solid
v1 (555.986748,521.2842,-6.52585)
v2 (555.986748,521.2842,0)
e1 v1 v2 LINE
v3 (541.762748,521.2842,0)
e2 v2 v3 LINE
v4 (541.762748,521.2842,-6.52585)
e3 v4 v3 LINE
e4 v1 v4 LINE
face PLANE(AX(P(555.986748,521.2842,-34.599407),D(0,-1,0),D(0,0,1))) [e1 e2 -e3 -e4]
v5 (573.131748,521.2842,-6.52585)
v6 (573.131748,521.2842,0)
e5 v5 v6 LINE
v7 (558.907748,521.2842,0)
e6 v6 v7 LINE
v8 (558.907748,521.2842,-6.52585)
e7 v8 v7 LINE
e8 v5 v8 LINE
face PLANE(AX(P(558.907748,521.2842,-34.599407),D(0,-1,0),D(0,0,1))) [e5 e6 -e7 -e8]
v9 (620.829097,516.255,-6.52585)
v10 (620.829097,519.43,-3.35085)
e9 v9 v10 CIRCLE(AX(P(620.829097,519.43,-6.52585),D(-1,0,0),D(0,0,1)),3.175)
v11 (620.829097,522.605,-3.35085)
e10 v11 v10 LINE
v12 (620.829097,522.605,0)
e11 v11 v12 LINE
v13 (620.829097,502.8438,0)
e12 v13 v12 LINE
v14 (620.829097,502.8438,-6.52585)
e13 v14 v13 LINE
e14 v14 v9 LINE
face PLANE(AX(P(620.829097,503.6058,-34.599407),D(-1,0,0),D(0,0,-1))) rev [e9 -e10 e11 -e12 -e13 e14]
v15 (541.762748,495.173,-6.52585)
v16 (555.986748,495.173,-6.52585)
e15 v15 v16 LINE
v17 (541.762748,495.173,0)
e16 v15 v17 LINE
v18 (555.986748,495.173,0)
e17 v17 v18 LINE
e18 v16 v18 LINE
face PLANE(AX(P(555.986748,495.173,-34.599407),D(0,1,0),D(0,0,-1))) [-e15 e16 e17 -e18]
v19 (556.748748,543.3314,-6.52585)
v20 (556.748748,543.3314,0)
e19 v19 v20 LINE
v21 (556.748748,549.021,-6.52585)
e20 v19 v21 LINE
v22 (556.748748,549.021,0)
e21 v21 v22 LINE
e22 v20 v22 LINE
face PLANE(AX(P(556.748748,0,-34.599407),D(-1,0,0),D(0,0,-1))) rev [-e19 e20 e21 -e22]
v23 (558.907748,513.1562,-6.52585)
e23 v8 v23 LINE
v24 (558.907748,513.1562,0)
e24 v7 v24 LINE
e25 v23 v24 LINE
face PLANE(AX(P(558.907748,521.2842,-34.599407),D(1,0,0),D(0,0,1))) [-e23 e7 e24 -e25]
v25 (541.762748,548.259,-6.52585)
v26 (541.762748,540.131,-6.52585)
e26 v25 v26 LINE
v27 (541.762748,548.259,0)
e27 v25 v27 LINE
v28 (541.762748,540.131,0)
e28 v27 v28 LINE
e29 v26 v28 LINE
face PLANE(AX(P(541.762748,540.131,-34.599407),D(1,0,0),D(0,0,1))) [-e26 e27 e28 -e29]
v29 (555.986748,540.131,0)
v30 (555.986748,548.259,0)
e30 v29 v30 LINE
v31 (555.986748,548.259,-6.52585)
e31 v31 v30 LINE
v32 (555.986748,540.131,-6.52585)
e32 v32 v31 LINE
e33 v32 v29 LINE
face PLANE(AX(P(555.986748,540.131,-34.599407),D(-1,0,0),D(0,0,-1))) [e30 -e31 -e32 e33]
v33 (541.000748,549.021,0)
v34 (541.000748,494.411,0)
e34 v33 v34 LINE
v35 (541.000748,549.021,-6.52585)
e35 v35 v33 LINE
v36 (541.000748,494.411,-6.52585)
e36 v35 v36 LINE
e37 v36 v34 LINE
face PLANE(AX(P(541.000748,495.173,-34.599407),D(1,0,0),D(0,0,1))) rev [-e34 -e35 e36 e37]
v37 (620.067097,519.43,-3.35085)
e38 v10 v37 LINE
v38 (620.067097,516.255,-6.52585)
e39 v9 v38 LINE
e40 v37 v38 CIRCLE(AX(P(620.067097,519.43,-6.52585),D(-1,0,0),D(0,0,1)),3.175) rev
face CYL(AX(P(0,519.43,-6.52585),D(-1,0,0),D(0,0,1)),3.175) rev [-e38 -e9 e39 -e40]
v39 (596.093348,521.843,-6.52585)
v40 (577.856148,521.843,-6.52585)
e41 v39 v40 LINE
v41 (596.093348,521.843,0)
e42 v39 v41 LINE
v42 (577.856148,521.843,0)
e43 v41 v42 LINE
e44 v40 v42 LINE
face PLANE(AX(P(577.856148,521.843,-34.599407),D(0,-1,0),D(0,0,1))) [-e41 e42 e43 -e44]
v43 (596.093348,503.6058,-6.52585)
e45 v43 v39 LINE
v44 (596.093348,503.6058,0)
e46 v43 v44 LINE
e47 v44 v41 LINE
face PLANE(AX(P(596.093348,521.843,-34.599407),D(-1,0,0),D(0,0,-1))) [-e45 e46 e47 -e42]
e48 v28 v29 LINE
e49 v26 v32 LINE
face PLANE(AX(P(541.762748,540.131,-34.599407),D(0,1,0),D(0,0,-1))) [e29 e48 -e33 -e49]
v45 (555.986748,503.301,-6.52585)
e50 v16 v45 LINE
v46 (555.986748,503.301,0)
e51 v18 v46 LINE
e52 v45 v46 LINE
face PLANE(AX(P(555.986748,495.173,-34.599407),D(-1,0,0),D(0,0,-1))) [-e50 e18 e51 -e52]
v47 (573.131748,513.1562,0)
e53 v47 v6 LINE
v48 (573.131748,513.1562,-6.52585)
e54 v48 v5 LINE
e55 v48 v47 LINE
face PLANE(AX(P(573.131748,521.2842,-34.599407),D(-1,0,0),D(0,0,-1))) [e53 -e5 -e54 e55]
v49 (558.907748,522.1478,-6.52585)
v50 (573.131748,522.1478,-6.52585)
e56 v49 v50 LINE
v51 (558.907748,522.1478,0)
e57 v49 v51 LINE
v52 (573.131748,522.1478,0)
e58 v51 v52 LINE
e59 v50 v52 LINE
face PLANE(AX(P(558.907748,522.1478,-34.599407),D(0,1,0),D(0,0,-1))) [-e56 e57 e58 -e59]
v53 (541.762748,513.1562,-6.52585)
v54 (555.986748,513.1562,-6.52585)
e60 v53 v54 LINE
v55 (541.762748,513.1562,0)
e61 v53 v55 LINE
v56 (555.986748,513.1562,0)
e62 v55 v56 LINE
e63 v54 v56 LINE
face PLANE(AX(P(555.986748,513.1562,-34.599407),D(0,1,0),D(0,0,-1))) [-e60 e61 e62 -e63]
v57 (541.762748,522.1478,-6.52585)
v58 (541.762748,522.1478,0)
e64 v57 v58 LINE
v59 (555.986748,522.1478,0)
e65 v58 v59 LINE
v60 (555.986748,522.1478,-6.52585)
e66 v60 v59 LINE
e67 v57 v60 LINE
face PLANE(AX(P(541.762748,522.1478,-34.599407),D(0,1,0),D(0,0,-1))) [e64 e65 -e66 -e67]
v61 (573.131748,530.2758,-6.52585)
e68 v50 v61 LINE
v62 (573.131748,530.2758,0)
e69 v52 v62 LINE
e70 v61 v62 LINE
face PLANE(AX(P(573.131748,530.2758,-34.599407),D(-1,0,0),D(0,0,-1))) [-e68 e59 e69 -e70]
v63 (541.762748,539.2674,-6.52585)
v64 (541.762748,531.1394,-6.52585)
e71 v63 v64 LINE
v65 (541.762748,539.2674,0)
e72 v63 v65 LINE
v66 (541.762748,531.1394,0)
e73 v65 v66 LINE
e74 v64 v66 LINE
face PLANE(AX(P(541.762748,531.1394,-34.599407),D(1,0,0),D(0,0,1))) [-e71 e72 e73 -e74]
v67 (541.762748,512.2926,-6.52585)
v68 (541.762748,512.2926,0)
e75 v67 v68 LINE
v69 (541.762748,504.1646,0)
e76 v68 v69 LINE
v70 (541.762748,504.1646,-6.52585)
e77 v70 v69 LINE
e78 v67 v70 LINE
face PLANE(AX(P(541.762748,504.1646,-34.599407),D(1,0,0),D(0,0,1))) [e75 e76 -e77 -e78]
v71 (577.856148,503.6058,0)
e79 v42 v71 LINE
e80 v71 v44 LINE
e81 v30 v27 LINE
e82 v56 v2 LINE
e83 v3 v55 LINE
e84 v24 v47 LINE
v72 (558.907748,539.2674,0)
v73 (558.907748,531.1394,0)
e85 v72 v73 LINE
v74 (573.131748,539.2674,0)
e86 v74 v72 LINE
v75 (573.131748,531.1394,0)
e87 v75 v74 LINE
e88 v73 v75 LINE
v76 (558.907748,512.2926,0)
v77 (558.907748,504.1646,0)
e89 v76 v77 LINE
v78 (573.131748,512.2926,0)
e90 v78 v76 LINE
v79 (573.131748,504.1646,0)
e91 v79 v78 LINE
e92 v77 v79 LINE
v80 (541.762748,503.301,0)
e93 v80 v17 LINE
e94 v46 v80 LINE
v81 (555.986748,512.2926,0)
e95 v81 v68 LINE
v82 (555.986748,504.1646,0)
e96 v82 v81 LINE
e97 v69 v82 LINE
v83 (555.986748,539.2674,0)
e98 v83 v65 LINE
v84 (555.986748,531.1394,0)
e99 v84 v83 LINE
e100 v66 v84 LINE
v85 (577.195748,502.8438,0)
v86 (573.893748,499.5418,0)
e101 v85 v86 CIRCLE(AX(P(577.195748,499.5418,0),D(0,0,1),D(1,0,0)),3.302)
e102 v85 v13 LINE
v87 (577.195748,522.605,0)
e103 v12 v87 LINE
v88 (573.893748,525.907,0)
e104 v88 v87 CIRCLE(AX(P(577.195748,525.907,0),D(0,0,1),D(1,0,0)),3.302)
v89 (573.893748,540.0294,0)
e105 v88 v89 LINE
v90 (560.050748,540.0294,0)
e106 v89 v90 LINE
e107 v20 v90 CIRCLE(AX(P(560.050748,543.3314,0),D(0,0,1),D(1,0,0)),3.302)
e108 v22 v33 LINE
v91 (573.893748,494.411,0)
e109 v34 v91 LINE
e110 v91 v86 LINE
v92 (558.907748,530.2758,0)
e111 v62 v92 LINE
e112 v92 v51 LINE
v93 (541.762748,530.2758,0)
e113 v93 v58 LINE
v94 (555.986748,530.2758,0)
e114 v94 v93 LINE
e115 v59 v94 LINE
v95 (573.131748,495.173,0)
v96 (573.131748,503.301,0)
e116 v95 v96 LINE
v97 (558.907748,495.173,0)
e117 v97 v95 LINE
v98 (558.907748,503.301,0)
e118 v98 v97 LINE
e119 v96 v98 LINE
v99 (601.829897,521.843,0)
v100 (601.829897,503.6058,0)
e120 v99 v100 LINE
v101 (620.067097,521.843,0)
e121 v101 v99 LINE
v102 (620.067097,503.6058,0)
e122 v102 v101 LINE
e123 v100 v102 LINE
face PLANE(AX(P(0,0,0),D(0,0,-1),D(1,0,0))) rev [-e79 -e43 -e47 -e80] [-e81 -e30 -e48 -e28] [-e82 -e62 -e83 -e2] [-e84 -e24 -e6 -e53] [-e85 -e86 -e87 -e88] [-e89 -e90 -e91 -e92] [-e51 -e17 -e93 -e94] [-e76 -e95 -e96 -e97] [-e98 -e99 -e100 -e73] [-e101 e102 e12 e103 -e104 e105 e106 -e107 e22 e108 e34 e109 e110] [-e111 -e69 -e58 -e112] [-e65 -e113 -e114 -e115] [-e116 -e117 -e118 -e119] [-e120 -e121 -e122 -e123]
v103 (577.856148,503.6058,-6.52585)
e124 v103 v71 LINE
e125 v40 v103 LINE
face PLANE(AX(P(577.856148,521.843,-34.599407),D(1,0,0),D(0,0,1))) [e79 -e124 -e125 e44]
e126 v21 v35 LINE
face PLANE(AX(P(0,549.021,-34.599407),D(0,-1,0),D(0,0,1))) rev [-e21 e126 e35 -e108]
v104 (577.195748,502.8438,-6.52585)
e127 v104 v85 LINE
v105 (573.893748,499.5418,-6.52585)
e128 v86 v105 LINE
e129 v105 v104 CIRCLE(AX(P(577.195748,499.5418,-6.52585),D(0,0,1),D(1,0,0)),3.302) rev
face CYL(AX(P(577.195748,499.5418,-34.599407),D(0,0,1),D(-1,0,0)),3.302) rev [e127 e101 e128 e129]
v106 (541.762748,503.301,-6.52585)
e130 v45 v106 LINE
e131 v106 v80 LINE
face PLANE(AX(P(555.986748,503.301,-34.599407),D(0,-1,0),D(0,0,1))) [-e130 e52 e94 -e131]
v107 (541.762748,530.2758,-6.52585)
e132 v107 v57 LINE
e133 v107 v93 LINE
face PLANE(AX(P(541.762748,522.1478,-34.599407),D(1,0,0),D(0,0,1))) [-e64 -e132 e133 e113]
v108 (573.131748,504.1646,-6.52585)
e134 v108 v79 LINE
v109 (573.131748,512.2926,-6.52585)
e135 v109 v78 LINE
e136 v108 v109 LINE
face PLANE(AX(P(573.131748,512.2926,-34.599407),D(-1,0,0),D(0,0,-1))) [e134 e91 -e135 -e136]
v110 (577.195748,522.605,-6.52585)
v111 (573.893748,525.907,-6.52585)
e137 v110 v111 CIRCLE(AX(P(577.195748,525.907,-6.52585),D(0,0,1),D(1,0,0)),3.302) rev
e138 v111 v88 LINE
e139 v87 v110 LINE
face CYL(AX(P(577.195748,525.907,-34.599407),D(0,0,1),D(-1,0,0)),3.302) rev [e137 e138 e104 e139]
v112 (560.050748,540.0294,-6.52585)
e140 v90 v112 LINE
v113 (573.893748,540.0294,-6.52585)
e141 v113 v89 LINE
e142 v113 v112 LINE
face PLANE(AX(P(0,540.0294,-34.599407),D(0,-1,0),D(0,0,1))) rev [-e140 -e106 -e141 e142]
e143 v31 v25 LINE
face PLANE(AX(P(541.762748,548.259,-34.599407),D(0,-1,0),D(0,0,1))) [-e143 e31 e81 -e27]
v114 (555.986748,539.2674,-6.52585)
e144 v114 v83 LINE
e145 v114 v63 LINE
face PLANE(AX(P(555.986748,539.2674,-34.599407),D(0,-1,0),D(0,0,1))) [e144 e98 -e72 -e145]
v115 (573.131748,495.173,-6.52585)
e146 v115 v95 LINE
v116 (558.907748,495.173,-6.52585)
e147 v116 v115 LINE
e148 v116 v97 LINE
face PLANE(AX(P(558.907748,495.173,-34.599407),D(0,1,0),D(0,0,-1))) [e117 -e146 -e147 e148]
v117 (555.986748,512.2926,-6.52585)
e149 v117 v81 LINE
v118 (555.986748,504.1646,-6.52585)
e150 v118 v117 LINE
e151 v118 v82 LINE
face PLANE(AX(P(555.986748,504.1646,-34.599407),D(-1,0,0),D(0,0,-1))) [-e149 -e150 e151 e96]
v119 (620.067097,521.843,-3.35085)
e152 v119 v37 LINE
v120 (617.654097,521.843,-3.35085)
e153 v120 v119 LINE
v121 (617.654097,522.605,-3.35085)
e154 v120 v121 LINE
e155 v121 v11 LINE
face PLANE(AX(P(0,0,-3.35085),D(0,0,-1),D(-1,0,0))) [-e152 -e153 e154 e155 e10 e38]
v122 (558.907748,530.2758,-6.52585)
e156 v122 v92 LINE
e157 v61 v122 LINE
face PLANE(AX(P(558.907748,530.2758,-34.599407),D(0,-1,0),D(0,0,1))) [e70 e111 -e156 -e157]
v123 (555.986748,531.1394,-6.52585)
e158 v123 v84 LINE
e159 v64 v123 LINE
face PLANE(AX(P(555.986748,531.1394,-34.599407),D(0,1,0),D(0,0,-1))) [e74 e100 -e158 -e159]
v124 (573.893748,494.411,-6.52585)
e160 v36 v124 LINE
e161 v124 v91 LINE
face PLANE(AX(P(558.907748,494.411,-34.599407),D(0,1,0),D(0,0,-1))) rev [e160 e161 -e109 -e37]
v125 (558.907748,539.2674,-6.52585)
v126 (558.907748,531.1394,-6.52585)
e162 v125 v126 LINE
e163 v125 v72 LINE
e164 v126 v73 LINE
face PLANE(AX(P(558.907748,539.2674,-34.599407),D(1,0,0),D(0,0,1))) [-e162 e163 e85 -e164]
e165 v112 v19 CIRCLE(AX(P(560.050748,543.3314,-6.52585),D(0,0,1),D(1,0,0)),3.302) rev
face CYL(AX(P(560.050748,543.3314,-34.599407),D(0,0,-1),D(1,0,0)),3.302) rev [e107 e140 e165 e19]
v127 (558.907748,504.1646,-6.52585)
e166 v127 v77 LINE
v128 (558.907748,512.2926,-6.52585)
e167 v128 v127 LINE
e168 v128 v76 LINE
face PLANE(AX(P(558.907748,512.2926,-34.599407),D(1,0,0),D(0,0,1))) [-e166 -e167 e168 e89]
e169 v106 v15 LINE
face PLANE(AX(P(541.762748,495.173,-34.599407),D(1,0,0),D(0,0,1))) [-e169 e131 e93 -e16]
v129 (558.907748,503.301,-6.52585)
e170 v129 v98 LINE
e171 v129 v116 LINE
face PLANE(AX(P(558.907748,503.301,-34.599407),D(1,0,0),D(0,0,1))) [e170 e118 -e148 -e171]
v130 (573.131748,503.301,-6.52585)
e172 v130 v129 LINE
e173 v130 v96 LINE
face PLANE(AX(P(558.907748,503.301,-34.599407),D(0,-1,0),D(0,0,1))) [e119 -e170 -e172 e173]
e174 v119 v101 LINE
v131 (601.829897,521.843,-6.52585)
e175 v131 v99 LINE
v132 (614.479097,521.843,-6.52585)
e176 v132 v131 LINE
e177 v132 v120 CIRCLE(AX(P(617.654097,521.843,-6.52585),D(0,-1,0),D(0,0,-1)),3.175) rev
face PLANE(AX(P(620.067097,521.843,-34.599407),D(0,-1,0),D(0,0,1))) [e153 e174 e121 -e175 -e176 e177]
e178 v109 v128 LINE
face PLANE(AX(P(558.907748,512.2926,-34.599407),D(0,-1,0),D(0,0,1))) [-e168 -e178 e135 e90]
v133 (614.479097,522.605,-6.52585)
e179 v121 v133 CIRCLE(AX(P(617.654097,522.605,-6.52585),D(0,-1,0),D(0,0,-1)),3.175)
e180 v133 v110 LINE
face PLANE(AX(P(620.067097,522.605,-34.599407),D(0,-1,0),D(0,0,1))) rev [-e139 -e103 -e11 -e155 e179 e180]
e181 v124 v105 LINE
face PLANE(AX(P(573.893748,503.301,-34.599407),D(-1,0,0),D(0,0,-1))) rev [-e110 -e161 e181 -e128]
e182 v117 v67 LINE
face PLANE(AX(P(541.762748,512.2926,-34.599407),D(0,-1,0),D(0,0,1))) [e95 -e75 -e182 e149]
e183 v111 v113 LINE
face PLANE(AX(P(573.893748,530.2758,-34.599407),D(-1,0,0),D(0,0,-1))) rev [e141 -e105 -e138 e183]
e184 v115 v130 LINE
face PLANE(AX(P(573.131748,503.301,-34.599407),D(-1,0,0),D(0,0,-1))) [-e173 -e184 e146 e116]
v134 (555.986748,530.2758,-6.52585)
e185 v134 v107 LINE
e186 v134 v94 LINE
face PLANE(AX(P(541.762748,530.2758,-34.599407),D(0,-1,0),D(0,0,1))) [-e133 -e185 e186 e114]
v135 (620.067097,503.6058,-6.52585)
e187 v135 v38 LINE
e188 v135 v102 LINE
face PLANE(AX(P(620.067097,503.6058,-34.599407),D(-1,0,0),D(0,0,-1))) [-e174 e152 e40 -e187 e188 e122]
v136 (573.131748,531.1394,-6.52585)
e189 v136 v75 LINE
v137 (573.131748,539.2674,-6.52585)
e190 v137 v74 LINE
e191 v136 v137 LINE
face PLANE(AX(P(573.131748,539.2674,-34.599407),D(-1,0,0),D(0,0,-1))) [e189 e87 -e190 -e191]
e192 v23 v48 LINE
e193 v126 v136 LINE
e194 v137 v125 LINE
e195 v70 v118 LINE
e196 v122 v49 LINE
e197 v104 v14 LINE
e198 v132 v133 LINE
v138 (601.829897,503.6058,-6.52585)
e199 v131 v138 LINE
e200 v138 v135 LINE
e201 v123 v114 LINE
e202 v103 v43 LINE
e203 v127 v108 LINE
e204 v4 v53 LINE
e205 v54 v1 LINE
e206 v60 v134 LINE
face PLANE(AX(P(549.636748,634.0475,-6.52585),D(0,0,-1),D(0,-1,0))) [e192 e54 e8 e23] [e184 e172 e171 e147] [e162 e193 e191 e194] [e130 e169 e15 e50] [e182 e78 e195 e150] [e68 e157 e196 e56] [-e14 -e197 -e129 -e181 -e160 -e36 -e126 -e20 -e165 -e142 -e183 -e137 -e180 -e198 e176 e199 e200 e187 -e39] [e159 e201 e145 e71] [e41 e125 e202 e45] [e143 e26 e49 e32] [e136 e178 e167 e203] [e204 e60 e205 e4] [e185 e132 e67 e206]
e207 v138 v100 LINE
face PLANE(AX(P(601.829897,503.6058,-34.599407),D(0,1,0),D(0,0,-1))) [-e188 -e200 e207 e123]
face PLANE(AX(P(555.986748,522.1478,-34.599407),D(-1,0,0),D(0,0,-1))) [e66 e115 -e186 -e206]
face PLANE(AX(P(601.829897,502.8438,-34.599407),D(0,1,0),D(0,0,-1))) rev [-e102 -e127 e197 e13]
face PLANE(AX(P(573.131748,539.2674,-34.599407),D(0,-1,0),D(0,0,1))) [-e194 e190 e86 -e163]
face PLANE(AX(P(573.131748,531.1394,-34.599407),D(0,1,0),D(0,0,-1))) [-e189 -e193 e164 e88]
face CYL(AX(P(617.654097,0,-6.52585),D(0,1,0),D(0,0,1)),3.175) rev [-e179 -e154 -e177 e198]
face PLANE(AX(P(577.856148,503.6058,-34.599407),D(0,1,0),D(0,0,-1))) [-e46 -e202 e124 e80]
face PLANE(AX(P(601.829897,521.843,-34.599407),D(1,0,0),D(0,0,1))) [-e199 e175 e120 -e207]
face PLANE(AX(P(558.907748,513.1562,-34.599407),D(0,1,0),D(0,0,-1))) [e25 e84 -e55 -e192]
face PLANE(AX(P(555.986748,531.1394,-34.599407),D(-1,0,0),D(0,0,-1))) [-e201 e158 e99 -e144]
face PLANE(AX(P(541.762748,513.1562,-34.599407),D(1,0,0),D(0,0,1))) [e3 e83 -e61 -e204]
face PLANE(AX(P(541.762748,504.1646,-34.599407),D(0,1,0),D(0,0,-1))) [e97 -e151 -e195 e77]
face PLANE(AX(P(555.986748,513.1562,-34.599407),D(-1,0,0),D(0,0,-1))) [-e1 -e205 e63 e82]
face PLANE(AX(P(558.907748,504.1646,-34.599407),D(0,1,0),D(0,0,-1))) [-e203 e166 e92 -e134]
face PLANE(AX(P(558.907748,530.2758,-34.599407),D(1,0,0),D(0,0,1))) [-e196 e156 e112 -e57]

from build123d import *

# Parameters (mm, degrees)
PART2_EYEBROW_START                          = -6.52585
PART2_EYEBROW_WARNING_MODULE_MIRRORED_OU_W   = 14.224
PART2_EYEBROW_WARNING_MODULE_MIRRORED_OU_H   = 8.128
PART2_EYEBROW_WARNING_MODULE_MIRRORED_OU_W_2 = 18.2372
PART2_EYEBROW_WARNING_MODULE_MIRRORED_OU_H_2 = 18.2372
PART2_EYEBROW_WARNING_MODULE_MIRRORED_DEPTH  = 6.52585
SKETCH2_W                                    = 6.35
SKETCH2_H                                    = 6.35
CUT_EXTRUDE1_DEPTH                           = 3.175
FILLET1_R                                    = 3.175


# Read off the part's stored shape, not the designer's step: Part2^Eyebrow Warning Module_Mirrored
with BuildPart() as part:
    # Part2^Eyebrow Warning Module_Mirrored ou → Part2^Eyebrow Warning Module_Mirrored (new body)
    with BuildSketch(Plane.XY.offset(PART2_EYEBROW_START)):
        with BuildLine():
            Line((573.893747576, 540.0294), (560.050747576, 540.0294))
            ThreePointArc((560.050747576, 540.0294), (557.715880985, 540.996533409), (556.748747576, 543.3314))
            Line((556.748747576, 543.3314), (556.748747576, 549.021))
            Line((556.748747576, 549.021), (541.000747576, 549.021))
            Line((541.000747576, 549.021), (541.000747576, 494.411))
            Line((541.000747576, 494.411), (573.893747576, 494.411))
            Line((573.893747576, 494.411), (573.893747576, 499.5418))
            ThreePointArc((573.893747576, 499.5418), (574.860880985, 501.876666591), (577.195747576, 502.8438))
            Line((577.195747576, 502.8438), (620.829097092, 502.8438))
            Line((620.829097092, 502.8438), (620.829097092, 522.605))
            Line((620.829097092, 522.605), (577.195747576, 522.605))
            ThreePointArc((577.195747576, 522.605), (574.860880985, 523.572133409), (573.893747576, 525.907))
            Line((573.893747576, 525.907), (573.893747576, 540.0294))
        make_face()
        with Locations((548.874747576, 499.237)):
            Rectangle(PART2_EYEBROW_WARNING_MODULE_MIRRORED_OU_W, PART2_EYEBROW_WARNING_MODULE_MIRRORED_OU_H, mode=Mode.SUBTRACT)
        with Locations((566.019747576, 499.237)):
            Rectangle(PART2_EYEBROW_WARNING_MODULE_MIRRORED_OU_W, PART2_EYEBROW_WARNING_MODULE_MIRRORED_OU_H, mode=Mode.SUBTRACT)
        with Locations((548.874747576, 508.2286)):
            Rectangle(PART2_EYEBROW_WARNING_MODULE_MIRRORED_OU_W, PART2_EYEBROW_WARNING_MODULE_MIRRORED_OU_H, mode=Mode.SUBTRACT)
        with Locations((548.874747576, 517.2202)):
            Rectangle(PART2_EYEBROW_WARNING_MODULE_MIRRORED_OU_W, PART2_EYEBROW_WARNING_MODULE_MIRRORED_OU_H, mode=Mode.SUBTRACT)
        with Locations((566.019747576, 508.2286)):
            Rectangle(PART2_EYEBROW_WARNING_MODULE_MIRRORED_OU_W, PART2_EYEBROW_WARNING_MODULE_MIRRORED_OU_H, mode=Mode.SUBTRACT)
        with Locations((566.019747576, 517.2202)):
            Rectangle(PART2_EYEBROW_WARNING_MODULE_MIRRORED_OU_W, PART2_EYEBROW_WARNING_MODULE_MIRRORED_OU_H, mode=Mode.SUBTRACT)
        with Locations((586.974747576, 512.7244)):
            Rectangle(PART2_EYEBROW_WARNING_MODULE_MIRRORED_OU_W_2, PART2_EYEBROW_WARNING_MODULE_MIRRORED_OU_H_2, mode=Mode.SUBTRACT)
        with Locations((610.948497092, 512.7244)):
            Rectangle(PART2_EYEBROW_WARNING_MODULE_MIRRORED_OU_W_2, PART2_EYEBROW_WARNING_MODULE_MIRRORED_OU_H_2, mode=Mode.SUBTRACT)
        with Locations((548.874747576, 526.2118)):
            Rectangle(PART2_EYEBROW_WARNING_MODULE_MIRRORED_OU_W, PART2_EYEBROW_WARNING_MODULE_MIRRORED_OU_H, mode=Mode.SUBTRACT)
        with Locations((548.874747576, 535.2034)):
            Rectangle(PART2_EYEBROW_WARNING_MODULE_MIRRORED_OU_W, PART2_EYEBROW_WARNING_MODULE_MIRRORED_OU_H, mode=Mode.SUBTRACT)
        with Locations((566.019747576, 526.2118)):
            Rectangle(PART2_EYEBROW_WARNING_MODULE_MIRRORED_OU_W, PART2_EYEBROW_WARNING_MODULE_MIRRORED_OU_H, mode=Mode.SUBTRACT)
        with Locations((566.019747576, 535.2034)):
            Rectangle(PART2_EYEBROW_WARNING_MODULE_MIRRORED_OU_W, PART2_EYEBROW_WARNING_MODULE_MIRRORED_OU_H, mode=Mode.SUBTRACT)
        with Locations((548.874747576, 544.195)):
            Rectangle(PART2_EYEBROW_WARNING_MODULE_MIRRORED_OU_W, PART2_EYEBROW_WARNING_MODULE_MIRRORED_OU_H, mode=Mode.SUBTRACT)
    extrude(amount=PART2_EYEBROW_WARNING_MODULE_MIRRORED_DEPTH)

    # Sketch2 → Cut-Extrude1 (cut)
    with BuildSketch(Plane(origin=(0, 0, -6.52585), x_dir=(-1, 0, 0), z_dir=(0, 0, -1))):
        with Locations((-617.654097092, 519.43)):
            Rectangle(SKETCH2_W, SKETCH2_H)
    extrude(amount=-CUT_EXTRUDE1_DEPTH, mode=Mode.SUBTRACT)

    # Fillet1
    fillet1_edges = [part.edges().sort_by_distance(p)[0] for p in [
        (614.479097092, 522.224, -3.35085),
        (620.448097092, 516.255, -3.35085),
    ]]
    fillet(fillet1_edges, radius=FILLET1_R - 0.0001)  # a hair under: the kernel refuses the full size


solid = part.part
